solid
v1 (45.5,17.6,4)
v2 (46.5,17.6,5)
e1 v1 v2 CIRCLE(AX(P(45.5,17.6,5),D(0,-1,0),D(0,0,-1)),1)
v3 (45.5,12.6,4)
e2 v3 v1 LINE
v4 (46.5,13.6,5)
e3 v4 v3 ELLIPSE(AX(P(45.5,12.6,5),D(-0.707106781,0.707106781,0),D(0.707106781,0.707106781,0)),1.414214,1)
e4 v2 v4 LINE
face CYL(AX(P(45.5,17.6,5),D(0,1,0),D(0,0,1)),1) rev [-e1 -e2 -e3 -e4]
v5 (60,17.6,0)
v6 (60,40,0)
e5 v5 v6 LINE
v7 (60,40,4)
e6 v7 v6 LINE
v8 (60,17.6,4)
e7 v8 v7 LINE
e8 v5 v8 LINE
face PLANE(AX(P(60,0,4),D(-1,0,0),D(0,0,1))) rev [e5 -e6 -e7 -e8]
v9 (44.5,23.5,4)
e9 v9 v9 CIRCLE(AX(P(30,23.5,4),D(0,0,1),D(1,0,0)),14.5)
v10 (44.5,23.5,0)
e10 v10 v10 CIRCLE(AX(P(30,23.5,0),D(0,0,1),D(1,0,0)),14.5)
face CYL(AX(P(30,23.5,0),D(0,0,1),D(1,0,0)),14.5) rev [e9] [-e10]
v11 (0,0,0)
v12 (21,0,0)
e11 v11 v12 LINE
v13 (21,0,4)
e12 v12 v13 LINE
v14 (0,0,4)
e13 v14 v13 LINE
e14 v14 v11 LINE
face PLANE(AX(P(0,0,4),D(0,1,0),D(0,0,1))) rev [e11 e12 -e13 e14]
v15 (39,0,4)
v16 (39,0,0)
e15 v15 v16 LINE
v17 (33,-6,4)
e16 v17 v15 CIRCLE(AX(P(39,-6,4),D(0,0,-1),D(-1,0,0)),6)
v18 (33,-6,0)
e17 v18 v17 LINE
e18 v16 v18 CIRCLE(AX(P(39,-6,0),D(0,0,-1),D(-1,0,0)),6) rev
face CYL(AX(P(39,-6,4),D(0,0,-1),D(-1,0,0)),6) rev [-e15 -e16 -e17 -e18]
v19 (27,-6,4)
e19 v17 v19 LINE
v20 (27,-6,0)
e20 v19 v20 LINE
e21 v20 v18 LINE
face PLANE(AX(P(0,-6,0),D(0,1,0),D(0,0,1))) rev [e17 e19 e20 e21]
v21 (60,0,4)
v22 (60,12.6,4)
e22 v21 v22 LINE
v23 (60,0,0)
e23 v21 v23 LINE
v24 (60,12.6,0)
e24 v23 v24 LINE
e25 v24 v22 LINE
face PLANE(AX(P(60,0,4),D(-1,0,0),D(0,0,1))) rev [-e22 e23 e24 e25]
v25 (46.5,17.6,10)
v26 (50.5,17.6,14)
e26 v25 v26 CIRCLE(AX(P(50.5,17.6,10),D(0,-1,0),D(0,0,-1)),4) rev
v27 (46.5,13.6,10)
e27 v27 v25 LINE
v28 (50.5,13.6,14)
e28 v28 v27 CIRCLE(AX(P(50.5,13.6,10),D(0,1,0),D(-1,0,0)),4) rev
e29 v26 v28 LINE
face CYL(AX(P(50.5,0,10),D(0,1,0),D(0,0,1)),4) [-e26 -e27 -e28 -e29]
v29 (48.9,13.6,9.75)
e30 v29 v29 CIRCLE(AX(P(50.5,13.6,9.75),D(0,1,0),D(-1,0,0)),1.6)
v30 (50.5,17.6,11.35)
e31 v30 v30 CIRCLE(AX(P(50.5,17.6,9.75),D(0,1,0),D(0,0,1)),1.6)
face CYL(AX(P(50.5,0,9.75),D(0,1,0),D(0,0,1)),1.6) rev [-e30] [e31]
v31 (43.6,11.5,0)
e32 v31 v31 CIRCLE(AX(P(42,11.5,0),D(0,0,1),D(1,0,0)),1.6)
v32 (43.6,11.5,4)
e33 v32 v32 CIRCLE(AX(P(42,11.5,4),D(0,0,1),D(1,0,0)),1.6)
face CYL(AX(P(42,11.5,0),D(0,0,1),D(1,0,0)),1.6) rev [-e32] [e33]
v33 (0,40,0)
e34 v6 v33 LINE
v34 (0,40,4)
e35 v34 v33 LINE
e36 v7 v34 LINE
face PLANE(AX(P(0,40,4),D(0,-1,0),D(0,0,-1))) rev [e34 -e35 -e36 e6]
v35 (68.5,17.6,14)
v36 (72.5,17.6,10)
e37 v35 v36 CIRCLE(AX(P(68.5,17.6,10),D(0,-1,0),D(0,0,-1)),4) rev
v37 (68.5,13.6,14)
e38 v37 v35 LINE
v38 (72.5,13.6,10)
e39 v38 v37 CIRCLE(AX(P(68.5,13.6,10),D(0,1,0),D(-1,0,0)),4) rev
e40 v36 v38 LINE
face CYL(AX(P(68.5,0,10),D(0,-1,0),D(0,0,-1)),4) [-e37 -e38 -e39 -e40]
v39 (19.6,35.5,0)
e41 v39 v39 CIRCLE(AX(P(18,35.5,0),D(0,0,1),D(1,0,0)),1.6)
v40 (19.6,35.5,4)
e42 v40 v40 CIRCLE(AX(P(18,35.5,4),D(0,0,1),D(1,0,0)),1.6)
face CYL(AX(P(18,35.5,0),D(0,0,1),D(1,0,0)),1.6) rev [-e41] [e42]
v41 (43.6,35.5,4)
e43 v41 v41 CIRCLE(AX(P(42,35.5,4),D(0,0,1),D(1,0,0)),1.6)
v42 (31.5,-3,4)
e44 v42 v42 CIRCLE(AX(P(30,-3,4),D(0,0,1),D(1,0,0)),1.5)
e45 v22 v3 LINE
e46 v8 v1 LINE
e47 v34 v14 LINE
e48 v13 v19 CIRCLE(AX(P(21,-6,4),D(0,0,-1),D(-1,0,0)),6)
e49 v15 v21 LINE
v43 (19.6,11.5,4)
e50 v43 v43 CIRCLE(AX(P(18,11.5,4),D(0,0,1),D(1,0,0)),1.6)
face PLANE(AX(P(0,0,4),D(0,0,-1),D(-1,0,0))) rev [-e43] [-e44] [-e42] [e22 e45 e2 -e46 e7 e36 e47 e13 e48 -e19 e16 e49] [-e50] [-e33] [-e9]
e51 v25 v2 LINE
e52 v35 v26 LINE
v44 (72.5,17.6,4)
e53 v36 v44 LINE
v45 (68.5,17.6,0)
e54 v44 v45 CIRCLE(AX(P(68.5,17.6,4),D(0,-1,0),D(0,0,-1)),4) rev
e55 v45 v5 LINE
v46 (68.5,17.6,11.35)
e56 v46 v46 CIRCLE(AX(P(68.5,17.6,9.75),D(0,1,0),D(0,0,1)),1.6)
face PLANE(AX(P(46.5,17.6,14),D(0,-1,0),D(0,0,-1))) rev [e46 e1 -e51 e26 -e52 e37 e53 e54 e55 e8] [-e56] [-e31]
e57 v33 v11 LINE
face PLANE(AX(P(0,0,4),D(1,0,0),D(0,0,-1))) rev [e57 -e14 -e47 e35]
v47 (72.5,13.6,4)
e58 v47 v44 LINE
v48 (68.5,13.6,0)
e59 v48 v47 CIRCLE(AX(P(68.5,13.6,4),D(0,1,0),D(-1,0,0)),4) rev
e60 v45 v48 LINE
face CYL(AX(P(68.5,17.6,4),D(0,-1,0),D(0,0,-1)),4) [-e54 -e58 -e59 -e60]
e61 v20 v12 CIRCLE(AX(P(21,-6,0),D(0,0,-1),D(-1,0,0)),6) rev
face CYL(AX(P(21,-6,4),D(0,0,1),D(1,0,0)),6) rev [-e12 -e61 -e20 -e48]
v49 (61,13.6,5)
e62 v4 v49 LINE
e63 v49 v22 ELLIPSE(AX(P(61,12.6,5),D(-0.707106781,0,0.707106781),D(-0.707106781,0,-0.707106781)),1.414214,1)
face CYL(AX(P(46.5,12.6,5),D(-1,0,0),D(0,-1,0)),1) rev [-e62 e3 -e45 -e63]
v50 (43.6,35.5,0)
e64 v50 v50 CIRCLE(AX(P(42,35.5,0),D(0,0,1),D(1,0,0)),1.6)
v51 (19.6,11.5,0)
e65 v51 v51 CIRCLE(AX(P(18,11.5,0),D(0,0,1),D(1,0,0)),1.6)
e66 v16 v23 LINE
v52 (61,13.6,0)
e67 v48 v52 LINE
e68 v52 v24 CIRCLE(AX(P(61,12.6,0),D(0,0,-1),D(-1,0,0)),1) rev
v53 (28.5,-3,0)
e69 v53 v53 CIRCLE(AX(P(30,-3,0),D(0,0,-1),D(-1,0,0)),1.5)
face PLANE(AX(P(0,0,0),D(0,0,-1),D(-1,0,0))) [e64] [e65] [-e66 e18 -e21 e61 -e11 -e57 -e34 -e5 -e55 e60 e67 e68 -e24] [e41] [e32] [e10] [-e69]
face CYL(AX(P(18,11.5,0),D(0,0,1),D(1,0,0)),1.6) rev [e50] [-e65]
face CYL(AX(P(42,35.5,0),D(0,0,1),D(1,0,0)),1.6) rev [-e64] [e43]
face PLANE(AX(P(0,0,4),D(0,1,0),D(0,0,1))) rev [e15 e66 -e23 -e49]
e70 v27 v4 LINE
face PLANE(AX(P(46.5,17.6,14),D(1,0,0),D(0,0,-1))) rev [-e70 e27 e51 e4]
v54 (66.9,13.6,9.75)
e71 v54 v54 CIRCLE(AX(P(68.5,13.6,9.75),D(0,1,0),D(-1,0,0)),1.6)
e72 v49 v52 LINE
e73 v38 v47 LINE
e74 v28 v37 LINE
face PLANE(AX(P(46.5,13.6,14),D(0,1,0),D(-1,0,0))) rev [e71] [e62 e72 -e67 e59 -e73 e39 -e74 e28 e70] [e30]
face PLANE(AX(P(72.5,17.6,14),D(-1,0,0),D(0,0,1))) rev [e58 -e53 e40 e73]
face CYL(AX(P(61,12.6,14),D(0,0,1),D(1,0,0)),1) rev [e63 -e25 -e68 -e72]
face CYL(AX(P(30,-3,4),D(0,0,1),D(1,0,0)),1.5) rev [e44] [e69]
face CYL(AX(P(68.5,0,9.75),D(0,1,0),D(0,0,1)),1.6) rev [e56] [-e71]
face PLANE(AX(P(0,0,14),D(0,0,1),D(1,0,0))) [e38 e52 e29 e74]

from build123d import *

# Parameters (mm, degrees)
SKETCH1_W                = 60
SKETCH1_H                = 40
BOSS_EXTRUDE1_DEPTH      = 4
SKETCH4_R                = 14.5
CUT_EXTRUDE1_DEPTH       = 4
SKETCH6_R                = 1.6
CUT_EXTRUDE2_DEPTH       = 4
SKETCH7_W                = 26
SKETCH7_H                = 4
BOSS_EXTRUDE3_DEPTH      = 10
SKETCH8_R                = 1.6
CUT_EXTRUDE3_DEPTH       = 78.162231694
SKETCH9_W                = 4
SKETCH9_H                = 4
BOSS_EXTRUDE4_DEPTH      = 12.5
FILLET2_R                = 4
FILLET3_R                = 1
SKETCH10_W               = 6
SKETCH10_H               = 4
BOSS_EXTRUDE5_DEPTH      = 6
FILLET4_R                = 6
F_3_0_3_DIAMETER_HOLE1_D = 3


with BuildPart() as part:
    # Sketch1 → Boss-Extrude1 (new body)
    with BuildSketch(Plane.XY):
        with Locations((30, 20)):
            Rectangle(SKETCH1_W, SKETCH1_H)
    extrude(amount=BOSS_EXTRUDE1_DEPTH)

    # Sketch4 → Cut-Extrude1 (cut)
    with BuildSketch(Plane.XY.offset(4)):
        with Locations((30, 23.5)):
            Circle(SKETCH4_R)
    extrude(amount=-CUT_EXTRUDE1_DEPTH, mode=Mode.SUBTRACT)

    # Sketch6 → Cut-Extrude2 (cut)
    with BuildSketch(Plane.XY.offset(4)):
        with Locations((42, 11.5)):
            Circle(SKETCH6_R)
        with Locations((18, 11.5)):
            Circle(SKETCH6_R)
        with Locations((18, 35.5)):
            Circle(SKETCH6_R)
        with Locations((42, 35.5)):
            Circle(SKETCH6_R)
    extrude(amount=-CUT_EXTRUDE2_DEPTH, mode=Mode.SUBTRACT)

    # Sketch7 → Boss-Extrude3 (add)
    with BuildSketch(Plane.XY.offset(4)):
        with Locations((59.5, 15.6)):
            Rectangle(SKETCH7_W, SKETCH7_H)
    extrude(amount=BOSS_EXTRUDE3_DEPTH)

    # Sketch8 → Cut-Extrude3 (cut, through all)
    with BuildSketch(Plane(origin=(0, 17.6, 0), x_dir=(1, 0, 0), z_dir=(0, 1, 0))):
        with Locations(Location((68.5, -9.75, 0), (0, 0, 270))):
            Circle(SKETCH8_R)
        with Locations(Location((50.5, -9.75, 0), (0, 0, 270))):
            Circle(SKETCH8_R)
    extrude(amount=-CUT_EXTRUDE3_DEPTH, mode=Mode.SUBTRACT)

    # Sketch9 → Boss-Extrude4 (add)
    with BuildSketch(Plane(origin=(60, 0, 0), x_dir=(0, 0, -1), z_dir=(1, 0, 0))):
        with Locations((-2, 15.6)):
            Rectangle(SKETCH9_W, SKETCH9_H)
    extrude(amount=BOSS_EXTRUDE4_DEPTH)

    # Fillet2
    fillet2_edges = [part.edges().sort_by_distance(p)[0] for p in [
        (46.5, 15.6, 14),
        (72.5, 15.6, 14),
        (72.5, 15.6, 0),
    ]]
    fillet(fillet2_edges, radius=FILLET2_R)

    # Fillet3
    fillet3_edges = [part.edges().sort_by_distance(p)[0] for p in [
        (46.5, 15.6, 4),
        (53.25, 13.6, 4),
        (60, 13.6, 2),
    ]]
    fillet(fillet3_edges, radius=FILLET3_R)

    # Sketch10 → Boss-Extrude5 (add)
    with BuildSketch(Plane.XZ):
        with Locations((30, 2)):
            Rectangle(SKETCH10_W, SKETCH10_H)
    extrude(amount=BOSS_EXTRUDE5_DEPTH)

    # Fillet4
    fillet4_edges = [part.edges().sort_by_distance(p)[0] for p in [
        (27, 0, 2),
        (33, 0, 2),
    ]]
    fillet(fillet4_edges, radius=FILLET4_R - 0.0001)  # a hair under: the kernel refuses the full size

    # Ø3.0 (3) Diameter Hole1 (through all)
    with Locations(Plane.XY.offset(4)):
        with Locations((30, -3)):
            Hole(F_3_0_3_DIAMETER_HOLE1_D / 2)


solid = part.part
